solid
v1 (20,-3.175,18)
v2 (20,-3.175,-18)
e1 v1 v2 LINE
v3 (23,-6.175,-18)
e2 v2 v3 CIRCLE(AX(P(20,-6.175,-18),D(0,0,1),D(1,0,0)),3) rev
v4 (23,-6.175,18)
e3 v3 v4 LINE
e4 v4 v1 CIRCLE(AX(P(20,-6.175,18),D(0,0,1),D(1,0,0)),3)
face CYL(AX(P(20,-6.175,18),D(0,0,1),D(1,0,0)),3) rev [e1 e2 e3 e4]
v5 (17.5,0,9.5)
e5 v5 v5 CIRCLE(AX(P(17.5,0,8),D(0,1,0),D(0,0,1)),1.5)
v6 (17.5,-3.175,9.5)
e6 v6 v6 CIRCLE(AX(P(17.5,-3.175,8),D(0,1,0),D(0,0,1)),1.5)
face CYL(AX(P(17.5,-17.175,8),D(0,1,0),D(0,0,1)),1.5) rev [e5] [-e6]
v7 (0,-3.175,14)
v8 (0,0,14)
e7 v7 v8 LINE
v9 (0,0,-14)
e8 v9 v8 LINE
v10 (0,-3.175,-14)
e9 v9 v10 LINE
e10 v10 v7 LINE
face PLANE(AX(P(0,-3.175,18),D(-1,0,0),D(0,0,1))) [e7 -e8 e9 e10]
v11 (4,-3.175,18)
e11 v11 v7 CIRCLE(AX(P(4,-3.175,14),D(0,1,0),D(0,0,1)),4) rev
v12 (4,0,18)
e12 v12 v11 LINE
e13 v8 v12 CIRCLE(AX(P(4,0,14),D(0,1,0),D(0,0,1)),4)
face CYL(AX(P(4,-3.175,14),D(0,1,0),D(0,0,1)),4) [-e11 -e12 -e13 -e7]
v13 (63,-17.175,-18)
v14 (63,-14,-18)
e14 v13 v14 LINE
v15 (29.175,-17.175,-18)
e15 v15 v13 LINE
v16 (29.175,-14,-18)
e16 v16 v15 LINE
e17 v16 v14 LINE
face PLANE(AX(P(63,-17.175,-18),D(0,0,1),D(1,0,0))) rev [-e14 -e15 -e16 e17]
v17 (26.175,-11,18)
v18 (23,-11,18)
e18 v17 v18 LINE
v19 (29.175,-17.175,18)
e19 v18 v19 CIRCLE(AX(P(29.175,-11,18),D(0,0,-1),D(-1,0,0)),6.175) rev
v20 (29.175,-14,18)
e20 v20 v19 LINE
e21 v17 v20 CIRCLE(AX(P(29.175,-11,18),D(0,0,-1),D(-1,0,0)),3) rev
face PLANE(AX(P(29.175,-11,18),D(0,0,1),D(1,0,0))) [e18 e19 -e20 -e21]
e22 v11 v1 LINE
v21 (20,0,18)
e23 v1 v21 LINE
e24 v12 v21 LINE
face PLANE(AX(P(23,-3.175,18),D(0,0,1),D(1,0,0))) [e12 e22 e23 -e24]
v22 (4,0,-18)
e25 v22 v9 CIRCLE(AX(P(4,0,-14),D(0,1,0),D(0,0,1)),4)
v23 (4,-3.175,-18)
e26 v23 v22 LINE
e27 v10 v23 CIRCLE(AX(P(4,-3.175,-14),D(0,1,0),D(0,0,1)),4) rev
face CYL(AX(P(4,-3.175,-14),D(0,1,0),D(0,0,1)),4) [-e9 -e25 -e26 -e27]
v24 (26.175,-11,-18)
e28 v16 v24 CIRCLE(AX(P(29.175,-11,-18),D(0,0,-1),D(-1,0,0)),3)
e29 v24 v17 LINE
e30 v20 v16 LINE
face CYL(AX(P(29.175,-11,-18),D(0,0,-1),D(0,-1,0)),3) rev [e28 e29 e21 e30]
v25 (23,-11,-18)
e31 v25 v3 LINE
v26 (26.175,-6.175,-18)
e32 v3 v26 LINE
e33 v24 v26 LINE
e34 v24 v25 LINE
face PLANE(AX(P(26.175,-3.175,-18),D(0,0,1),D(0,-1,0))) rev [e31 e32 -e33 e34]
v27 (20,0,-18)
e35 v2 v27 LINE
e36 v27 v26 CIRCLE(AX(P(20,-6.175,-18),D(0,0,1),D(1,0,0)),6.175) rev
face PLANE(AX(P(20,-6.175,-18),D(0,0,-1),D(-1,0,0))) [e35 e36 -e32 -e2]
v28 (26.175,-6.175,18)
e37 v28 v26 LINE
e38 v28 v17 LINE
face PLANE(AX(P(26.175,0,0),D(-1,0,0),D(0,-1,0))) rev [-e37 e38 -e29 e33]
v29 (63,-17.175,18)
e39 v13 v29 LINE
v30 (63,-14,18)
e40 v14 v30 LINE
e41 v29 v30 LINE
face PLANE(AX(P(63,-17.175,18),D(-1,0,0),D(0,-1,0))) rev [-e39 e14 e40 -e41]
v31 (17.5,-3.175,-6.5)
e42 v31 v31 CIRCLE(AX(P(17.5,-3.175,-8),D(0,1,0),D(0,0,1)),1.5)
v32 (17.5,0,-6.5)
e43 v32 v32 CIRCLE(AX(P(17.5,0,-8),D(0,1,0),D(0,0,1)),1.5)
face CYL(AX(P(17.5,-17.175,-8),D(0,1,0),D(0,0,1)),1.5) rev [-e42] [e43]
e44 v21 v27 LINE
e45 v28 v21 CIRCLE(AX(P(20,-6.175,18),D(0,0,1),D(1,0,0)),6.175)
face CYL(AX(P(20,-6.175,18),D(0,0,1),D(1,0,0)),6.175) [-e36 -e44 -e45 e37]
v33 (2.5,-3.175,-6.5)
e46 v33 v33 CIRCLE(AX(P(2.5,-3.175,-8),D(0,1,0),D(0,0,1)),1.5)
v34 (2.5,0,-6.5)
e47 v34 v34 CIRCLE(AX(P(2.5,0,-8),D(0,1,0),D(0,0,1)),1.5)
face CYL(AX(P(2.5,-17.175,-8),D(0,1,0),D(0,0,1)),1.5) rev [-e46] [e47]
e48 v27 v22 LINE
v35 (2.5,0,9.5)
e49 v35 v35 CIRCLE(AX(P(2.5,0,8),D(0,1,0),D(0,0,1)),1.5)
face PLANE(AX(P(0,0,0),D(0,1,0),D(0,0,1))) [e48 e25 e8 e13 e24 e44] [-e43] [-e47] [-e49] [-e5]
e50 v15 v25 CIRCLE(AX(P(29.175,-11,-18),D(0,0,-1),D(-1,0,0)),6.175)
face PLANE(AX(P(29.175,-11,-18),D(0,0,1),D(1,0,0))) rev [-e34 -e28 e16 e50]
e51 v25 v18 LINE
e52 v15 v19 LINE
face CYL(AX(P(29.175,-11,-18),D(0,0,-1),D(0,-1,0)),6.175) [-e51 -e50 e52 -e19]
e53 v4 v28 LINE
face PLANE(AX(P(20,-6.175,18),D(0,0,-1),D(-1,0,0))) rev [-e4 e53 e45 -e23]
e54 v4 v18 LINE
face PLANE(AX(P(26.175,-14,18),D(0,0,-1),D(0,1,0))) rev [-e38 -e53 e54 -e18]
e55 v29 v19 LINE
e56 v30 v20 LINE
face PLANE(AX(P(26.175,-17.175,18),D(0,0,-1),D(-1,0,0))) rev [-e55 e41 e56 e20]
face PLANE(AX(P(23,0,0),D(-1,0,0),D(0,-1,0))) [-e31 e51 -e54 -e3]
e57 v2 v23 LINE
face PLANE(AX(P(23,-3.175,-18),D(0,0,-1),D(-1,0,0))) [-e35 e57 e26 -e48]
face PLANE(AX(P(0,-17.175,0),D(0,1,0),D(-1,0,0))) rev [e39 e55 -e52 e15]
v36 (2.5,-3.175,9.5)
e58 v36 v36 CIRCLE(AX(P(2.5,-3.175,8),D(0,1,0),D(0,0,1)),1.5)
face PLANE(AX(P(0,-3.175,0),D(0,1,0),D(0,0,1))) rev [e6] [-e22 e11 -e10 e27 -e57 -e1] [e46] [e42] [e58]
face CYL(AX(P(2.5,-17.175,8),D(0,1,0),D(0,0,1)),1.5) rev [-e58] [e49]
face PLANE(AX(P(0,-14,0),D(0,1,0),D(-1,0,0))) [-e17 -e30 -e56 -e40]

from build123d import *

# Parameters (mm, degrees)
SKETCH2_W                    = 23
SKETCH2_H                    = 36
BASE_FLANGE1_DEPTH           = 3.175
EDGE_FLANGE4_STRIP_W         = 18.7
EDGE_FLANGE4_STRIP_H         = 3.175
EDGE_FLANGE4_STRIP_CUT_DEPTH = 36
EDGE_FLANGE4_DEPTH           = 36
EDGE_FLANGE5_STRIP_W         = 18.7
EDGE_FLANGE5_STRIP_H         = 3.175
EDGE_FLANGE5_STRIP_CUT_DEPTH = 36
EDGE_FLANGE5_DEPTH           = 36
SKETCH20_R                   = 1.5
CUT_EXTRUDE1_DEPTH           = 68.734633866
FILLET1_R                    = 4


# Sheet-metal steps are written as plain solids
with BuildPart() as part:
    # Sketch2 → Base-Flange1 (new body)
    with BuildSketch(Plane(origin=(0, 0, 0), x_dir=(1, 0, 0), z_dir=(0, 1, 0))):
        with Locations((11.5, 0)):
            Rectangle(SKETCH2_W, SKETCH2_H)
    extrude(amount=-BASE_FLANGE1_DEPTH)

    # Edge-Flange4 strip (across the edge) → Edge-Flange4 strip cut (cut)
    with BuildSketch(Plane(origin=(23, -3.175, -18), x_dir=(-1, 0, 0), z_dir=(0, 0, 1))):
        with Locations((-6.35, -1.5875)):
            Rectangle(EDGE_FLANGE4_STRIP_W, EDGE_FLANGE4_STRIP_H)
    extrude(amount=EDGE_FLANGE4_STRIP_CUT_DEPTH, mode=Mode.SUBTRACT)

    # Edge-Flange4 section (across the edge) → Edge-Flange4 (add)
    with BuildSketch(Plane(origin=(23, -3.175, -18), x_dir=(-1, 0, 0), z_dir=(0, 0, 1))):
        with BuildLine():
            Line((-3.175, 3), (-3.175, 10.825))
            Line((-3.175, 10.825), (0, 10.825))
            Line((0, 10.825), (0, 3))
            ThreePointArc((0, 3), (0.878679656, 0.878679656), (3, 0))
            Line((3, 0), (3, -3.175))
            ThreePointArc((3, -3.175), (-1.366384374, -1.366384374), (-3.175, 3))
        make_face()
    extrude(amount=EDGE_FLANGE4_DEPTH)

    # Edge-Flange5 strip (across the edge) → Edge-Flange5 strip cut (cut)
    with BuildSketch(Plane(origin=(26.175, -14, 18), x_dir=(0, 1, 0), z_dir=(0, 0, -1))):
        with Locations((-6.35, -1.5875)):
            Rectangle(EDGE_FLANGE5_STRIP_W, EDGE_FLANGE5_STRIP_H)
    extrude(amount=EDGE_FLANGE5_STRIP_CUT_DEPTH, mode=Mode.SUBTRACT)

    # Edge-Flange5 section (across the edge) → Edge-Flange5 (add)
    with BuildSketch(Plane(origin=(26.175, -14, 18), x_dir=(0, 1, 0), z_dir=(0, 0, -1))):
        with BuildLine():
            Line((-3.175, 3), (-3.175, 36.825))
            Line((-3.175, 36.825), (0, 36.825))
            Line((0, 36.825), (0, 3))
            ThreePointArc((0, 3), (0.878679656, 0.878679656), (3, 0))
            Line((3, 0), (3, -3.175))
            ThreePointArc((3, -3.175), (-1.366384374, -1.366384374), (-3.175, 3))
        make_face()
    extrude(amount=EDGE_FLANGE5_DEPTH)

    # Sketch20 → Cut-Extrude1 (cut, through all)
    with BuildSketch(Plane(origin=(0, 0, 0), x_dir=(1, 0, 0), z_dir=(0, 1, 0))):
        with Locations(Location((17.5, -8, 0), (0, 0, 270))):
            Circle(SKETCH20_R)
        with Locations(Location((17.5, 8, 0), (0, 0, 270))):
            Circle(SKETCH20_R)
        with Locations(Location((2.5, 8, 0), (0, 0, 270))):
            Circle(SKETCH20_R)
        with Locations(Location((2.5, -8, 0), (0, 0, 270))):
            Circle(SKETCH20_R)
    extrude(amount=-CUT_EXTRUDE1_DEPTH, mode=Mode.SUBTRACT)

    # Fillet1
    fillet1_edges = [part.edges().sort_by_distance(p)[0] for p in [
        (0, -1.5875, 18),
        (0, -1.5875, -18),
    ]]
    fillet(fillet1_edges, radius=FILLET1_R)


solid = part.part
